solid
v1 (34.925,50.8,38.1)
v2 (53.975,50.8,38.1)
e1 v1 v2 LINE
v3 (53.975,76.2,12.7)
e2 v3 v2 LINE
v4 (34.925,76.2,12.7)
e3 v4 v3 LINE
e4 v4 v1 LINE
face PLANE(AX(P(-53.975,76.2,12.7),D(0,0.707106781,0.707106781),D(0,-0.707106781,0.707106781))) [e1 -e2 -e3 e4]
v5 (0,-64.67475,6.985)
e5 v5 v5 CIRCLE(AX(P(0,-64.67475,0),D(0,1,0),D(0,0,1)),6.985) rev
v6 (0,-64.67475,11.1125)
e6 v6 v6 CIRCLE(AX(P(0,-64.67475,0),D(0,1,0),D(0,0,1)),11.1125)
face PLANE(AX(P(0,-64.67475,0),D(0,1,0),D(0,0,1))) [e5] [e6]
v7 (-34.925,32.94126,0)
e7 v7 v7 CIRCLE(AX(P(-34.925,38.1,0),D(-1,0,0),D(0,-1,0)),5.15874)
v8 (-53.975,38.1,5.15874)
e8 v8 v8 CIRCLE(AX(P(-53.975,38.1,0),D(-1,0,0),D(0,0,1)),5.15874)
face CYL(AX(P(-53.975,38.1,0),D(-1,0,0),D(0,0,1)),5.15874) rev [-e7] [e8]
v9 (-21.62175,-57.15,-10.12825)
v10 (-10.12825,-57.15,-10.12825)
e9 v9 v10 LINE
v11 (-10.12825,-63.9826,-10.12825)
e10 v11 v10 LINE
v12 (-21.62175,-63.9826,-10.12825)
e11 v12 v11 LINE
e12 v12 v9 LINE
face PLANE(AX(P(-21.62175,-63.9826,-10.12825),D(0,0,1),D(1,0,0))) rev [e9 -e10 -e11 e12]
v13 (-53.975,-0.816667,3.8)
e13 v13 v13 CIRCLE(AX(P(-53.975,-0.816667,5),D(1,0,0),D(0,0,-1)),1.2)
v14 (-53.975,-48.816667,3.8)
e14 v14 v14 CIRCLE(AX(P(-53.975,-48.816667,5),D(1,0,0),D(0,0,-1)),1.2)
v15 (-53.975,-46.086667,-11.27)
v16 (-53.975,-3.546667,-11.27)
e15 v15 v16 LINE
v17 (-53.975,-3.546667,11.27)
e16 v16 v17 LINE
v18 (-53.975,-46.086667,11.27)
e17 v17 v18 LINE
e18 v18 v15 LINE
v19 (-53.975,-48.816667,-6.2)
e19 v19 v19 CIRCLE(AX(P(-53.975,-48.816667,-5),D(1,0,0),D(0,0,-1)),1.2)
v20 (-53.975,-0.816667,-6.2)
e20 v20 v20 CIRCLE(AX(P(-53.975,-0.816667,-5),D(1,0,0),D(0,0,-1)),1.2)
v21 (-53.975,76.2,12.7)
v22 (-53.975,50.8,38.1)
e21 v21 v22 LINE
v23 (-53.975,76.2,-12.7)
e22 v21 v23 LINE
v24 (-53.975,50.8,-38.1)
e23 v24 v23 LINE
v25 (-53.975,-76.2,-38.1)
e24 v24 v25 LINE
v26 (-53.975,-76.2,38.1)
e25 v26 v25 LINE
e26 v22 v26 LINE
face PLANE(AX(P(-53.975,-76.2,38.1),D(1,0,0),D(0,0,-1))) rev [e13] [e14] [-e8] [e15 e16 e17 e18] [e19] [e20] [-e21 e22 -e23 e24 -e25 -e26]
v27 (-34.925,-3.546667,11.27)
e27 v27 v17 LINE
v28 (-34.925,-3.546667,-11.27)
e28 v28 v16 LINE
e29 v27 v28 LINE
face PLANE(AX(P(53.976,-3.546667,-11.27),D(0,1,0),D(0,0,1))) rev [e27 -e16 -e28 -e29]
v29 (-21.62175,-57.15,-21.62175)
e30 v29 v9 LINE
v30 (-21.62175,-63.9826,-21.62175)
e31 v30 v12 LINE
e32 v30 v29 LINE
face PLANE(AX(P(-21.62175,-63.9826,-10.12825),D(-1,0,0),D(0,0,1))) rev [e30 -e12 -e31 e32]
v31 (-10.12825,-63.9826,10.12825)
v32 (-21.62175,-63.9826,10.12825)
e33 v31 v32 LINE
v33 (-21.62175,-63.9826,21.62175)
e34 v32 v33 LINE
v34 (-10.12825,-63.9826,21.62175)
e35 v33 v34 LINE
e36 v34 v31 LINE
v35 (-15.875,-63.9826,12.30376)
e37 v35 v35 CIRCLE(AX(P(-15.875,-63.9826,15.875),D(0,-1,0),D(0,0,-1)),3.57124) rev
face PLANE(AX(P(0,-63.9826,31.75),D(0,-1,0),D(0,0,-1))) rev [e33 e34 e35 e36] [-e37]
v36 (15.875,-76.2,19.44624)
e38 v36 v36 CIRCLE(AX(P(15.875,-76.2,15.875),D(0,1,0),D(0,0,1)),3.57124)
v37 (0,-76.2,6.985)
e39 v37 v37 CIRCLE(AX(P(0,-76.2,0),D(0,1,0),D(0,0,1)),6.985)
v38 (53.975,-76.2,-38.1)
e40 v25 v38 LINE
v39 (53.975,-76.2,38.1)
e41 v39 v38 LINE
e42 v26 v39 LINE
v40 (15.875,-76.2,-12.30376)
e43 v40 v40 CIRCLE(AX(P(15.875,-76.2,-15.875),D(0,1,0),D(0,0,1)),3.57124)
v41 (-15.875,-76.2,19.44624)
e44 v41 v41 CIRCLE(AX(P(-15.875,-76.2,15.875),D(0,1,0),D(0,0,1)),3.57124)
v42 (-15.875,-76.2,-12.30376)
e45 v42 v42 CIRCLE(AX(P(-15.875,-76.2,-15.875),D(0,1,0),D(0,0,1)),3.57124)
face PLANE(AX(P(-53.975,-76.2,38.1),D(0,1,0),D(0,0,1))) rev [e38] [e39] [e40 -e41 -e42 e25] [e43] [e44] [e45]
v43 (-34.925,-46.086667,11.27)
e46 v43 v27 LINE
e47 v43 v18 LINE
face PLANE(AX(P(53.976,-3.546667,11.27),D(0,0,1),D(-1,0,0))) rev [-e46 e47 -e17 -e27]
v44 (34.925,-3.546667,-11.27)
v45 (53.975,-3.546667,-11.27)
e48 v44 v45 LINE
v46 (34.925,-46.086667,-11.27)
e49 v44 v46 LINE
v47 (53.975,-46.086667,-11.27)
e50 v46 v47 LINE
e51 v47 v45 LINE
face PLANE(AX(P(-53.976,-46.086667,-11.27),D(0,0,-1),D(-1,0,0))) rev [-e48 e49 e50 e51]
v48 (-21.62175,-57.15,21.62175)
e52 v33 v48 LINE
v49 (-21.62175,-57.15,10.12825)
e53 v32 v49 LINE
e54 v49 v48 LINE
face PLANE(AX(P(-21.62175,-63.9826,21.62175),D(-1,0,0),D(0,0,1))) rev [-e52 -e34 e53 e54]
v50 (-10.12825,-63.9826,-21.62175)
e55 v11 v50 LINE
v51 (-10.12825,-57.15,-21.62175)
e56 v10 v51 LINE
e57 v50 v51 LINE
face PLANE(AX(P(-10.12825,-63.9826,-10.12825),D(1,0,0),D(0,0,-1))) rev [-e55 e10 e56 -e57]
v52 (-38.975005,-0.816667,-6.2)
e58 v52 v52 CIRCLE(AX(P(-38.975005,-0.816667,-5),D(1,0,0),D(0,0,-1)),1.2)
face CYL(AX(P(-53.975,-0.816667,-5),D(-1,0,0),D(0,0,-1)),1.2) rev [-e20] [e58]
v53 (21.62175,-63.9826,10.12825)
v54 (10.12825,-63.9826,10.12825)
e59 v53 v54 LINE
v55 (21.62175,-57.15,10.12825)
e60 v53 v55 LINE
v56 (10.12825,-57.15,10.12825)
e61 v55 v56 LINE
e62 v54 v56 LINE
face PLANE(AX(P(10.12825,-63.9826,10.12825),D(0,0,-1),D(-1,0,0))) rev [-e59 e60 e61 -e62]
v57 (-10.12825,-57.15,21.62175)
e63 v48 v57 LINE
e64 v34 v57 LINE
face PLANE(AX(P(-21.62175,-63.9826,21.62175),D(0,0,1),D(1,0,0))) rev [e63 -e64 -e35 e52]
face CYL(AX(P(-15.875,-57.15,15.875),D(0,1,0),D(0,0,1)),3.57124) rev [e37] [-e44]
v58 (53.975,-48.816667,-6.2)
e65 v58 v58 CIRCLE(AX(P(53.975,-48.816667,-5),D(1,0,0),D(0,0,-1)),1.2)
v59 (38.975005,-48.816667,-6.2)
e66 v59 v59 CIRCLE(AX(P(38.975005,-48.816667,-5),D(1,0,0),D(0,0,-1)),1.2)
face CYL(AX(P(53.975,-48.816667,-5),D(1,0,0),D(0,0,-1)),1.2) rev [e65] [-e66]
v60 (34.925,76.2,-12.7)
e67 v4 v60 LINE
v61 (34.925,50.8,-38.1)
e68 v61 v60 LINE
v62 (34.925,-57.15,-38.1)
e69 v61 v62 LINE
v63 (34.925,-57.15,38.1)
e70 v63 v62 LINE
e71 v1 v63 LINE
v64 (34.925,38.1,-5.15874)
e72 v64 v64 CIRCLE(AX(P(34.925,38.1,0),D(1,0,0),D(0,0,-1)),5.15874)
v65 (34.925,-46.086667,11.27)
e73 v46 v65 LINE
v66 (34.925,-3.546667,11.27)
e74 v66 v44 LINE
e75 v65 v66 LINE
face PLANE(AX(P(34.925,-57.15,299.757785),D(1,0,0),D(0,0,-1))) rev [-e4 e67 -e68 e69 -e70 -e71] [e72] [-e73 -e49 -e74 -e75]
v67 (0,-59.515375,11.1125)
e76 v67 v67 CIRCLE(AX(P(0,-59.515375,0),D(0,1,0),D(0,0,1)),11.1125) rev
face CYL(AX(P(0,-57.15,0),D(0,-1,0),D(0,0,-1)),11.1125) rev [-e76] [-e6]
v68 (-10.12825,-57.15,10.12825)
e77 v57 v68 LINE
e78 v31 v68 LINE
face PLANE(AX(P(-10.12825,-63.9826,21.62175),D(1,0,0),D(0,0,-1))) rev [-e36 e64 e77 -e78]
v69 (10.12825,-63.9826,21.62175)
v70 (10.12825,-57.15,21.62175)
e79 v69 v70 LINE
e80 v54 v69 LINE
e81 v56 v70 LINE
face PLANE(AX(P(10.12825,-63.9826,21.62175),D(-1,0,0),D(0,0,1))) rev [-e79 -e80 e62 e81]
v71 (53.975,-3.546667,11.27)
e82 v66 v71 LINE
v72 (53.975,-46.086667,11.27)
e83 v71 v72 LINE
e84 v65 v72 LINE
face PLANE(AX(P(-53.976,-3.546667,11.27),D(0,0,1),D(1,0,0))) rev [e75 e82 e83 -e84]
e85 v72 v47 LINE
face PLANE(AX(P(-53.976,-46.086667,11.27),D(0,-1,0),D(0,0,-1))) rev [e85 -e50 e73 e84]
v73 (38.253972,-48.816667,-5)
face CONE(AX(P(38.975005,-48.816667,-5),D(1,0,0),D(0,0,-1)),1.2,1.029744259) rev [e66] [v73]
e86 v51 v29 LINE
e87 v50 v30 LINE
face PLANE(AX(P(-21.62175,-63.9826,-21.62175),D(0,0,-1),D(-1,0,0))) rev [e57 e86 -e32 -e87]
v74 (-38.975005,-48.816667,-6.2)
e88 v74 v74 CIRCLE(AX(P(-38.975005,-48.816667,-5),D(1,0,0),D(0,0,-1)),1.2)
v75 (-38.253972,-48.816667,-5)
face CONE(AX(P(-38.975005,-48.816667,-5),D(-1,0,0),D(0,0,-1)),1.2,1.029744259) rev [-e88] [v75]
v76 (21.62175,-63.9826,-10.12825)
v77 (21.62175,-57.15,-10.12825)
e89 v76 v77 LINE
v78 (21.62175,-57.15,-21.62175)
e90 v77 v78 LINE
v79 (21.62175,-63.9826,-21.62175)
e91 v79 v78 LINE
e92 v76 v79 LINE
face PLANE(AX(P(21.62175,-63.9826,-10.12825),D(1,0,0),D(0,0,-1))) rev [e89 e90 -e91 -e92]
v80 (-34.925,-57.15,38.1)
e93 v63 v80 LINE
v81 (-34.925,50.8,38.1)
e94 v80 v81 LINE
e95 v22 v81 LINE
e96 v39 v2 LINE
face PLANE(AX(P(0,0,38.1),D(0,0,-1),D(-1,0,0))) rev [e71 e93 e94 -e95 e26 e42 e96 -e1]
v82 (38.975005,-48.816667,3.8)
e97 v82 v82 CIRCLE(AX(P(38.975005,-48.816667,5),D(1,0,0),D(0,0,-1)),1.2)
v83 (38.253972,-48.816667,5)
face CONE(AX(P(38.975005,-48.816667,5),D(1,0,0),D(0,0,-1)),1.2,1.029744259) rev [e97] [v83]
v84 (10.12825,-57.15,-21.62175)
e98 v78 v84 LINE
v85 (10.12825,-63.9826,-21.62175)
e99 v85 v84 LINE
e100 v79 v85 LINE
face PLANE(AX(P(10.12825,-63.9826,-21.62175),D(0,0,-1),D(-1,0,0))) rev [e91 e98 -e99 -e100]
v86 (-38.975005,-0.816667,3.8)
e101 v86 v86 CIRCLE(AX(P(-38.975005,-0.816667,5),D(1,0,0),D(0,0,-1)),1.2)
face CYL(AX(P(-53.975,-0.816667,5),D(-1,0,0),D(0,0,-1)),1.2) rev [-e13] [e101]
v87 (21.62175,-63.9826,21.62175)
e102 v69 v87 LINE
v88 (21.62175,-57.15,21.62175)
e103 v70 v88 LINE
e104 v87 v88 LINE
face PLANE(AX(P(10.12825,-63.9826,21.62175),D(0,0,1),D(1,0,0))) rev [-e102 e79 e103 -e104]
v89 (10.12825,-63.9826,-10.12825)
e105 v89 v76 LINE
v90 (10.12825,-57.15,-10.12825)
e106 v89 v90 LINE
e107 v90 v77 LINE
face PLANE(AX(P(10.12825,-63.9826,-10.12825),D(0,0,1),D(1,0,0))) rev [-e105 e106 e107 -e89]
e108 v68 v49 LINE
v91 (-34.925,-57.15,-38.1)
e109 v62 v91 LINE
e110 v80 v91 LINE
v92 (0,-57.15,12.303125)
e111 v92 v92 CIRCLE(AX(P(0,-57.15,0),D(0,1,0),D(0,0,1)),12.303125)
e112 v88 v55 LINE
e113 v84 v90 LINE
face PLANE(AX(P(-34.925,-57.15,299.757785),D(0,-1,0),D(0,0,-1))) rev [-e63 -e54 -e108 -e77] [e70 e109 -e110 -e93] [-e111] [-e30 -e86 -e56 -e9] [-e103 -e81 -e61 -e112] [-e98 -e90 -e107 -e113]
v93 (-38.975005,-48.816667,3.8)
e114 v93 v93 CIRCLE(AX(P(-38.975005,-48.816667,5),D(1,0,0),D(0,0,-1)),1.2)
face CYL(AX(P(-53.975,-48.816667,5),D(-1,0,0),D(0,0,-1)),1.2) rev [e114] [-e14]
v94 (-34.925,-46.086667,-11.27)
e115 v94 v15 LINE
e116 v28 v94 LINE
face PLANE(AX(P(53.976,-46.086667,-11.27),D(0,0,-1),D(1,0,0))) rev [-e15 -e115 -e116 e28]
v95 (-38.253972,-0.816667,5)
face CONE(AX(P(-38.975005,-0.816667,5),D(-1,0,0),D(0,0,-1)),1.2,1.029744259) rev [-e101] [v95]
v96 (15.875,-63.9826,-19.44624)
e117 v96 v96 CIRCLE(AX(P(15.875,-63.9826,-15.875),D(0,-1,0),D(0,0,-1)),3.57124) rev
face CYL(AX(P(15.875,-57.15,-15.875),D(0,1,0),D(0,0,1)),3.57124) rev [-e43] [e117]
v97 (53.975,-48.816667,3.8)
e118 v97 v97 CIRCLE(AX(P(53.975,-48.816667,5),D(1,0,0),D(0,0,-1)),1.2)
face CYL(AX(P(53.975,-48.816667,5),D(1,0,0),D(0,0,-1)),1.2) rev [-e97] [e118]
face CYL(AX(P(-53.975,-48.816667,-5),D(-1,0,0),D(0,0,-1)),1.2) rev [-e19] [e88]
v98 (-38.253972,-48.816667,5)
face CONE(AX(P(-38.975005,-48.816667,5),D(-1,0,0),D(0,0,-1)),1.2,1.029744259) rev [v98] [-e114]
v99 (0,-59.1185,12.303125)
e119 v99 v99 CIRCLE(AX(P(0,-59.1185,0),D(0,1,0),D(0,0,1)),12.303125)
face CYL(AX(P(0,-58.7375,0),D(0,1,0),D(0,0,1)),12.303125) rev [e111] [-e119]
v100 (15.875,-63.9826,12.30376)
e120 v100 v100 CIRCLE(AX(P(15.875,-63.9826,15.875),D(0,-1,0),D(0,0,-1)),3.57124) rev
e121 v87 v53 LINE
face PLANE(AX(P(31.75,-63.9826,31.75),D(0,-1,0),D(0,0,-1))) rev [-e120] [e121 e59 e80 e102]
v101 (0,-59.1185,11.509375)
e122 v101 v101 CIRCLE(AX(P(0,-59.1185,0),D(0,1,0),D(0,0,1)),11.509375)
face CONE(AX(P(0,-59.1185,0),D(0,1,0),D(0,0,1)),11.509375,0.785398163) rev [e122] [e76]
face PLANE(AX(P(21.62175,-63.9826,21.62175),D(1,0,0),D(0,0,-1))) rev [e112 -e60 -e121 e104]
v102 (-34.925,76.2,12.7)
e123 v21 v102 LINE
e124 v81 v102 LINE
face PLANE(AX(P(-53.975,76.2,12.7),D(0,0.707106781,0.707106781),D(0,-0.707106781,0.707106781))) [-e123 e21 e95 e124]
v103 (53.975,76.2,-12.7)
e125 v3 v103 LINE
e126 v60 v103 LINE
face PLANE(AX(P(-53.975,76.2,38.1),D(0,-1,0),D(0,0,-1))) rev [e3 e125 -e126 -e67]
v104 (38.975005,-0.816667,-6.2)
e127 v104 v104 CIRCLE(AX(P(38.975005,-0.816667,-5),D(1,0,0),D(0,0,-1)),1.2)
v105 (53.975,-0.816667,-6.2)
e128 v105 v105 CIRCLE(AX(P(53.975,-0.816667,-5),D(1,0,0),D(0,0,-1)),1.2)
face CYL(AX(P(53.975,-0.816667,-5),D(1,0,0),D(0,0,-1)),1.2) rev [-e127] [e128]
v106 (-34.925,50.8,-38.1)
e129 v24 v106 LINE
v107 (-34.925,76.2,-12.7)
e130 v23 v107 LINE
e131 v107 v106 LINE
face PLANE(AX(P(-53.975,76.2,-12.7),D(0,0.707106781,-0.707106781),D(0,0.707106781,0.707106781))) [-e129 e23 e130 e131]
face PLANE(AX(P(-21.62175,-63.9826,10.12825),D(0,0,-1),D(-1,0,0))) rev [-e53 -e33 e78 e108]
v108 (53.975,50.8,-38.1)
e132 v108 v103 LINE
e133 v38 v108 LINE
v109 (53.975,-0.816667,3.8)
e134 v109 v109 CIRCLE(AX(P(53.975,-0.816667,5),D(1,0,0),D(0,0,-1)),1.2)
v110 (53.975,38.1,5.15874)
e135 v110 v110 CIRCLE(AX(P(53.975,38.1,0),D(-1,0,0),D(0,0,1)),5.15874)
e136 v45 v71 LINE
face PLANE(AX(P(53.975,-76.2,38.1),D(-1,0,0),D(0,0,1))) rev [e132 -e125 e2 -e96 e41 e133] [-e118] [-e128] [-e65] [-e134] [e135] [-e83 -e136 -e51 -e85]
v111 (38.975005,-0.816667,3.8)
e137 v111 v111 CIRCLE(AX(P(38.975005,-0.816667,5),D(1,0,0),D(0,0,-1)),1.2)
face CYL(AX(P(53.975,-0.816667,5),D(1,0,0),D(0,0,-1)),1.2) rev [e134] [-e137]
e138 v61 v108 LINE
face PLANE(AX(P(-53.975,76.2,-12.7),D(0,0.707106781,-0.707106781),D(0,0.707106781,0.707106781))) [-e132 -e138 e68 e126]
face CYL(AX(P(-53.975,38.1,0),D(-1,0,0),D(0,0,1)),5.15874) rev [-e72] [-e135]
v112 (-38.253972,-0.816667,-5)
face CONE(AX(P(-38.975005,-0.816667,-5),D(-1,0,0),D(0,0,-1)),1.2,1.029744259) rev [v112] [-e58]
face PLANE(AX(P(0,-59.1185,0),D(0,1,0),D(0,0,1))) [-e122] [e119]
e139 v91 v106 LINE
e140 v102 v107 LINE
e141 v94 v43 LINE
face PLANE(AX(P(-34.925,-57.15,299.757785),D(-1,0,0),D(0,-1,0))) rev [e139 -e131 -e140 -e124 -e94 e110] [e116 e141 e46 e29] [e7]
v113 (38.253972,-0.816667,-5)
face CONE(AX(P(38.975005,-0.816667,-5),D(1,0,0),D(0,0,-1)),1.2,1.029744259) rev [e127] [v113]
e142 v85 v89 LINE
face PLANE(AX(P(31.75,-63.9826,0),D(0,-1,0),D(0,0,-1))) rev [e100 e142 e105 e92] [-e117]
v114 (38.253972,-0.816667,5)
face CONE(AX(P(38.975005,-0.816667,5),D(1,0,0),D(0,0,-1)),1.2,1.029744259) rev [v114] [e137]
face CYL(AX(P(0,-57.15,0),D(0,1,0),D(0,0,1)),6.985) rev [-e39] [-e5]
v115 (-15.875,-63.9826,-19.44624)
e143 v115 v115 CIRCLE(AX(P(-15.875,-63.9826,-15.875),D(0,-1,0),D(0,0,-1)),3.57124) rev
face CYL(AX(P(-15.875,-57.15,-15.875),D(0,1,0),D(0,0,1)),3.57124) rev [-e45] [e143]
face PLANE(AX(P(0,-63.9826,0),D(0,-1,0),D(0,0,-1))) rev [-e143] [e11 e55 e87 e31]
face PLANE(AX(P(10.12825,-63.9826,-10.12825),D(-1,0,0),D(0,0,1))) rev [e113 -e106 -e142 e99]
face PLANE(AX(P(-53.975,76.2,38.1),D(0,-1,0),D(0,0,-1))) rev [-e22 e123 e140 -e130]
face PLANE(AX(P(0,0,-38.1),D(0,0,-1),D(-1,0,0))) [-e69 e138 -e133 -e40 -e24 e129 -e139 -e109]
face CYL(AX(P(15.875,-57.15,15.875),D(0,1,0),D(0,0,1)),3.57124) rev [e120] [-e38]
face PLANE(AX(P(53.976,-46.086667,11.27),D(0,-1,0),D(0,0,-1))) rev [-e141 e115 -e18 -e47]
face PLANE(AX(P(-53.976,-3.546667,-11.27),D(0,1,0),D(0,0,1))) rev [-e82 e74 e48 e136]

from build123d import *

# Parameters (mm, degrees)
SKETCH27_W                    = 107.95
SKETCH27_H                    = 152.4
BOSS_EXTRUDE4_DEPTH           = 38.1
CUT_EXTRUDE5_DEPTH            = 101.853114107
CUT_EXTRUDE5_DEPTH_BACK       = 101.853114107
CUT_EXTRUDE6_DEPTH            = 101.853114107
CUT_EXTRUDE6_DEPTH_BACK       = 101.853114107
SKETCH30_OUTSIDE_W            = 118.542
SKETCH30_OUTSIDE_H            = 194.742
F_3_8_CLEARANCE_HOLE4_D       = 10.31748
CUT_EXTRUDE8_REACH            = 139.518
SKETCH49_W                    = 22.54
SKETCH49_H                    = 42.54
M2_CLEARANCE_HOLE2_AT_2_COUNT = 2
M2_CLEARANCE_HOLE2_AT_2_PITCH = 10
M2_CLEARANCE_HOLE2_AT_3_COUNT = 2
M2_CLEARANCE_HOLE2_AT_3_PITCH = 49.030602689
M2_CLEARANCE_HOLE2_AT_4_COUNT = 2
M2_CLEARANCE_HOLE2_AT_4_PITCH = 48
F_1_4_CLEARANCE_HOLE1_D       = 7.14248
SKETCH53_W                    = 11.4935
SKETCH53_H                    = 11.4935
CUT_EXTRUDE9_DEPTH            = 6.8326
F_3_8_CLEARANCE_HOLE5_D       = 13.97


with BuildPart() as part:
    # Sketch27 → Boss-Extrude4 (new, symmetric)
    with BuildSketch(Plane.XY):
        Rectangle(SKETCH27_W, SKETCH27_H)
    extrude(amount=BOSS_EXTRUDE4_DEPTH, both=True)

    # Sketch28 → Cut-Extrude5 (cut, two sides: drawn at the far end of the back side and taken through both)
    with BuildSketch(Plane.XY.offset(-CUT_EXTRUDE5_DEPTH_BACK)):
        Polygon((-34.925, 439.068077332), (-34.925, 76.2), (-34.925, -57.15), (34.925, -57.15), (34.925, 76.2), (34.925, 439.068077332), (34.925, 1164.804231996), (-34.925, 1164.804231996), align=None)
    extrude(amount=CUT_EXTRUDE5_DEPTH + CUT_EXTRUDE5_DEPTH_BACK, mode=Mode.SUBTRACT)

    # Sketch30 outside → Cut-Extrude6 (cut, two sides: drawn at the far end of the back side and taken through both)
    with BuildSketch(Plane(origin=(0, 0, 0), x_dir=(0, 0, -1), z_dir=(1, 0, 0)).offset(-CUT_EXTRUDE6_DEPTH_BACK)):
        Rectangle(SKETCH30_OUTSIDE_W, SKETCH30_OUTSIDE_H)
        Polygon((-38.1, 50.8), (-38.1, -76.2), (38.1, -76.2), (38.1, 50.8), (12.7, 76.2), (-12.7, 76.2), align=None, mode=Mode.SUBTRACT)
    extrude(amount=CUT_EXTRUDE6_DEPTH + CUT_EXTRUDE6_DEPTH_BACK, mode=Mode.SUBTRACT)

    # 3/8 Clearance Hole4 (through all)
    with Locations(Plane.ZY.offset(53.975)):
        with Locations((0, 38.1)):
            Hole(F_3_8_CLEARANCE_HOLE4_D / 2)

    # Sketch49 → Cut-Extrude8 (cut, up to next)
    with BuildSketch(Plane(origin=(53.975, 0, 0), x_dir=(0, 0, -1), z_dir=(1, 0, 0)), mode=Mode.PRIVATE) as cut_extrude8_sk1:
        with Locations((0, -24.816666667)):
            Rectangle(SKETCH49_W, SKETCH49_H)
    cut_extrude8_tool1 = extrude(cut_extrude8_sk1.sketch, amount=-CUT_EXTRUDE8_REACH, mode=Mode.PRIVATE) & part.part
    cut_extrude8 = cut_extrude8_tool1.solids().sort_by_distance((53.975, -24.816667, 0))[0]
    add(cut_extrude8, mode=Mode.SUBTRACT)

    # Sketch51 → M2 Clearance Hole2 (revolve, cut)
    with BuildSketch(Plane(origin=(53.975, -48.816666667, 5), x_dir=(0, 0, -1), z_dir=(0, 1, 0))):
        Polygon((0, 0), (0, 15.721028143), (1.2, 14.9999954), (1.2, 0), align=None)
    m2_clearance_hole2 = revolve(axis=Axis((60.325, -48.816666667, 5), (-1, 0, 0)), mode=Mode.SUBTRACT)

    # M2 Clearance Hole2 at 2: M2 Clearance Hole2 ×2
    with Locations(*[(0, 0, -i * M2_CLEARANCE_HOLE2_AT_2_PITCH) for i in range(1, M2_CLEARANCE_HOLE2_AT_2_COUNT)]):
        add(m2_clearance_hole2, mode=Mode.SUBTRACT)

    # M2 Clearance Hole2 at 3: M2 Clearance Hole2 ×2
    with Locations(*[Vector(0, 0.9789804197376051, -0.20395425411200102) * (i * M2_CLEARANCE_HOLE2_AT_3_PITCH) for i in range(1, M2_CLEARANCE_HOLE2_AT_3_COUNT)]):
        add(m2_clearance_hole2, mode=Mode.SUBTRACT)

    # M2 Clearance Hole2 at 4: M2 Clearance Hole2 ×2
    with Locations(*[(0, i * M2_CLEARANCE_HOLE2_AT_4_PITCH, 0) for i in range(1, M2_CLEARANCE_HOLE2_AT_4_COUNT)]):
        add(m2_clearance_hole2, mode=Mode.SUBTRACT)

    # Mirror2: Cut-Extrude8, M2 Clearance Hole2 across plane
    add(cut_extrude8.mirror(Plane(origin=(0, 0, 0), x_dir=(0, 0, 1), z_dir=(1, 0, 0))), mode=Mode.SUBTRACT)
    add(m2_clearance_hole2.mirror(Plane(origin=(0, 0, 0), x_dir=(0, 0, 1), z_dir=(1, 0, 0))), mode=Mode.SUBTRACT)

    # Mirror2 copy 1 sketch → Mirror2 copy 1 (revolve, cut)
    with BuildSketch(Plane(origin=(-53.975, -48.816666667, -5), x_dir=(0, 0, -1), z_dir=(0, 1, 0))):
        Polygon((0, 0), (0, -15.721028143), (1.2, -14.9999954), (1.2, 0), align=None)
    revolve(axis=Axis((-60.325, -48.816666667, -5), (-1, 0, 0)), mode=Mode.SUBTRACT)

    # Mirror2 copy 2 sketch → Mirror2 copy 2 (revolve, cut)
    with BuildSketch(Plane(origin=(-53.975, -0.816666667, -5), x_dir=(0, 0, -1), z_dir=(0, 1, 0))):
        Polygon((0, 0), (0, -15.721028143), (1.2, -14.9999954), (1.2, 0), align=None)
    revolve(axis=Axis((-60.325, -0.816666667, -5), (-1, 0, 0)), mode=Mode.SUBTRACT)

    # Mirror2 copy 3 sketch → Mirror2 copy 3 (revolve, cut)
    with BuildSketch(Plane(origin=(-53.975, -0.816666667, 5), x_dir=(0, 0, -1), z_dir=(0, 1, 0))):
        Polygon((0, 0), (0, -15.721028143), (1.2, -14.9999954), (1.2, 0), align=None)
    revolve(axis=Axis((-60.325, -0.816666667, 5), (-1, 0, 0)), mode=Mode.SUBTRACT)

    # 1/4 Clearance Hole1 (through all)
    with Locations(Plane(origin=(0, -57.15, 0), x_dir=(1, 0, 0), z_dir=(0, 1, 0))):
        with Locations((-15.875, 15.875)):
            f_1_4_clearance_hole1 = Hole(F_1_4_CLEARANCE_HOLE1_D / 2)

    # Sketch53 → Cut-Extrude9 (cut)
    with BuildSketch(Plane(origin=(0, -57.15, 0), x_dir=(1, 0, 0), z_dir=(0, 1, 0))):
        with Locations((-15.875, 15.875)):
            Rectangle(SKETCH53_W, SKETCH53_H)
    cut_extrude9 = extrude(amount=-CUT_EXTRUDE9_DEPTH, mode=Mode.SUBTRACT)

    # Sketch-Pattern1: 1/4 Clearance Hole1, Cut-Extrude9 at 3 more places
    with Locations((31.75, 0, 0), (31.75, 0, 31.75), (0, 0, 31.75)):
        add(f_1_4_clearance_hole1, mode=Mode.SUBTRACT)
        add(cut_extrude9, mode=Mode.SUBTRACT)

    # 3/8 Clearance Hole5 (through all)
    with Locations(Plane(origin=(0, -57.15, 0), x_dir=(1, 0, 0), z_dir=(0, 1, 0))):
        with Locations((0, 0)):
            Hole(F_3_8_CLEARANCE_HOLE5_D / 2)


with BuildPart() as body_2:
    # uxcell-FR6ZZ: read off the stored shape, not the designer's step
    # uxcell-FR6ZZ outline → uxcell-FR6ZZ (revolve)
    with BuildSketch(Plane.XY):
        Polygon((12.303125, 7.14375), (4.7625, 7.14375), (4.7625, -0.381), (11.1125, -0.381), (11.1125, 4.778375), (11.509375, 5.17525), (12.303125, 5.17525), align=None)
    revolve(axis=Axis((0, 0, 0), (0, 1, 0)))


with BuildPart() as body_2_1:
    # Body-Move/Copy2: read off the stored shape, not the designer's step
    # Body-Move/Copy2: moved
    add(body_2.part.moved(Location((0, -64.29375, 0))))


with BuildPart() as part_1:
    add(part.part)

    # Combine1: cut body 2
    add(body_2_1.part, mode=Mode.SUBTRACT)


solid = part_1.part
